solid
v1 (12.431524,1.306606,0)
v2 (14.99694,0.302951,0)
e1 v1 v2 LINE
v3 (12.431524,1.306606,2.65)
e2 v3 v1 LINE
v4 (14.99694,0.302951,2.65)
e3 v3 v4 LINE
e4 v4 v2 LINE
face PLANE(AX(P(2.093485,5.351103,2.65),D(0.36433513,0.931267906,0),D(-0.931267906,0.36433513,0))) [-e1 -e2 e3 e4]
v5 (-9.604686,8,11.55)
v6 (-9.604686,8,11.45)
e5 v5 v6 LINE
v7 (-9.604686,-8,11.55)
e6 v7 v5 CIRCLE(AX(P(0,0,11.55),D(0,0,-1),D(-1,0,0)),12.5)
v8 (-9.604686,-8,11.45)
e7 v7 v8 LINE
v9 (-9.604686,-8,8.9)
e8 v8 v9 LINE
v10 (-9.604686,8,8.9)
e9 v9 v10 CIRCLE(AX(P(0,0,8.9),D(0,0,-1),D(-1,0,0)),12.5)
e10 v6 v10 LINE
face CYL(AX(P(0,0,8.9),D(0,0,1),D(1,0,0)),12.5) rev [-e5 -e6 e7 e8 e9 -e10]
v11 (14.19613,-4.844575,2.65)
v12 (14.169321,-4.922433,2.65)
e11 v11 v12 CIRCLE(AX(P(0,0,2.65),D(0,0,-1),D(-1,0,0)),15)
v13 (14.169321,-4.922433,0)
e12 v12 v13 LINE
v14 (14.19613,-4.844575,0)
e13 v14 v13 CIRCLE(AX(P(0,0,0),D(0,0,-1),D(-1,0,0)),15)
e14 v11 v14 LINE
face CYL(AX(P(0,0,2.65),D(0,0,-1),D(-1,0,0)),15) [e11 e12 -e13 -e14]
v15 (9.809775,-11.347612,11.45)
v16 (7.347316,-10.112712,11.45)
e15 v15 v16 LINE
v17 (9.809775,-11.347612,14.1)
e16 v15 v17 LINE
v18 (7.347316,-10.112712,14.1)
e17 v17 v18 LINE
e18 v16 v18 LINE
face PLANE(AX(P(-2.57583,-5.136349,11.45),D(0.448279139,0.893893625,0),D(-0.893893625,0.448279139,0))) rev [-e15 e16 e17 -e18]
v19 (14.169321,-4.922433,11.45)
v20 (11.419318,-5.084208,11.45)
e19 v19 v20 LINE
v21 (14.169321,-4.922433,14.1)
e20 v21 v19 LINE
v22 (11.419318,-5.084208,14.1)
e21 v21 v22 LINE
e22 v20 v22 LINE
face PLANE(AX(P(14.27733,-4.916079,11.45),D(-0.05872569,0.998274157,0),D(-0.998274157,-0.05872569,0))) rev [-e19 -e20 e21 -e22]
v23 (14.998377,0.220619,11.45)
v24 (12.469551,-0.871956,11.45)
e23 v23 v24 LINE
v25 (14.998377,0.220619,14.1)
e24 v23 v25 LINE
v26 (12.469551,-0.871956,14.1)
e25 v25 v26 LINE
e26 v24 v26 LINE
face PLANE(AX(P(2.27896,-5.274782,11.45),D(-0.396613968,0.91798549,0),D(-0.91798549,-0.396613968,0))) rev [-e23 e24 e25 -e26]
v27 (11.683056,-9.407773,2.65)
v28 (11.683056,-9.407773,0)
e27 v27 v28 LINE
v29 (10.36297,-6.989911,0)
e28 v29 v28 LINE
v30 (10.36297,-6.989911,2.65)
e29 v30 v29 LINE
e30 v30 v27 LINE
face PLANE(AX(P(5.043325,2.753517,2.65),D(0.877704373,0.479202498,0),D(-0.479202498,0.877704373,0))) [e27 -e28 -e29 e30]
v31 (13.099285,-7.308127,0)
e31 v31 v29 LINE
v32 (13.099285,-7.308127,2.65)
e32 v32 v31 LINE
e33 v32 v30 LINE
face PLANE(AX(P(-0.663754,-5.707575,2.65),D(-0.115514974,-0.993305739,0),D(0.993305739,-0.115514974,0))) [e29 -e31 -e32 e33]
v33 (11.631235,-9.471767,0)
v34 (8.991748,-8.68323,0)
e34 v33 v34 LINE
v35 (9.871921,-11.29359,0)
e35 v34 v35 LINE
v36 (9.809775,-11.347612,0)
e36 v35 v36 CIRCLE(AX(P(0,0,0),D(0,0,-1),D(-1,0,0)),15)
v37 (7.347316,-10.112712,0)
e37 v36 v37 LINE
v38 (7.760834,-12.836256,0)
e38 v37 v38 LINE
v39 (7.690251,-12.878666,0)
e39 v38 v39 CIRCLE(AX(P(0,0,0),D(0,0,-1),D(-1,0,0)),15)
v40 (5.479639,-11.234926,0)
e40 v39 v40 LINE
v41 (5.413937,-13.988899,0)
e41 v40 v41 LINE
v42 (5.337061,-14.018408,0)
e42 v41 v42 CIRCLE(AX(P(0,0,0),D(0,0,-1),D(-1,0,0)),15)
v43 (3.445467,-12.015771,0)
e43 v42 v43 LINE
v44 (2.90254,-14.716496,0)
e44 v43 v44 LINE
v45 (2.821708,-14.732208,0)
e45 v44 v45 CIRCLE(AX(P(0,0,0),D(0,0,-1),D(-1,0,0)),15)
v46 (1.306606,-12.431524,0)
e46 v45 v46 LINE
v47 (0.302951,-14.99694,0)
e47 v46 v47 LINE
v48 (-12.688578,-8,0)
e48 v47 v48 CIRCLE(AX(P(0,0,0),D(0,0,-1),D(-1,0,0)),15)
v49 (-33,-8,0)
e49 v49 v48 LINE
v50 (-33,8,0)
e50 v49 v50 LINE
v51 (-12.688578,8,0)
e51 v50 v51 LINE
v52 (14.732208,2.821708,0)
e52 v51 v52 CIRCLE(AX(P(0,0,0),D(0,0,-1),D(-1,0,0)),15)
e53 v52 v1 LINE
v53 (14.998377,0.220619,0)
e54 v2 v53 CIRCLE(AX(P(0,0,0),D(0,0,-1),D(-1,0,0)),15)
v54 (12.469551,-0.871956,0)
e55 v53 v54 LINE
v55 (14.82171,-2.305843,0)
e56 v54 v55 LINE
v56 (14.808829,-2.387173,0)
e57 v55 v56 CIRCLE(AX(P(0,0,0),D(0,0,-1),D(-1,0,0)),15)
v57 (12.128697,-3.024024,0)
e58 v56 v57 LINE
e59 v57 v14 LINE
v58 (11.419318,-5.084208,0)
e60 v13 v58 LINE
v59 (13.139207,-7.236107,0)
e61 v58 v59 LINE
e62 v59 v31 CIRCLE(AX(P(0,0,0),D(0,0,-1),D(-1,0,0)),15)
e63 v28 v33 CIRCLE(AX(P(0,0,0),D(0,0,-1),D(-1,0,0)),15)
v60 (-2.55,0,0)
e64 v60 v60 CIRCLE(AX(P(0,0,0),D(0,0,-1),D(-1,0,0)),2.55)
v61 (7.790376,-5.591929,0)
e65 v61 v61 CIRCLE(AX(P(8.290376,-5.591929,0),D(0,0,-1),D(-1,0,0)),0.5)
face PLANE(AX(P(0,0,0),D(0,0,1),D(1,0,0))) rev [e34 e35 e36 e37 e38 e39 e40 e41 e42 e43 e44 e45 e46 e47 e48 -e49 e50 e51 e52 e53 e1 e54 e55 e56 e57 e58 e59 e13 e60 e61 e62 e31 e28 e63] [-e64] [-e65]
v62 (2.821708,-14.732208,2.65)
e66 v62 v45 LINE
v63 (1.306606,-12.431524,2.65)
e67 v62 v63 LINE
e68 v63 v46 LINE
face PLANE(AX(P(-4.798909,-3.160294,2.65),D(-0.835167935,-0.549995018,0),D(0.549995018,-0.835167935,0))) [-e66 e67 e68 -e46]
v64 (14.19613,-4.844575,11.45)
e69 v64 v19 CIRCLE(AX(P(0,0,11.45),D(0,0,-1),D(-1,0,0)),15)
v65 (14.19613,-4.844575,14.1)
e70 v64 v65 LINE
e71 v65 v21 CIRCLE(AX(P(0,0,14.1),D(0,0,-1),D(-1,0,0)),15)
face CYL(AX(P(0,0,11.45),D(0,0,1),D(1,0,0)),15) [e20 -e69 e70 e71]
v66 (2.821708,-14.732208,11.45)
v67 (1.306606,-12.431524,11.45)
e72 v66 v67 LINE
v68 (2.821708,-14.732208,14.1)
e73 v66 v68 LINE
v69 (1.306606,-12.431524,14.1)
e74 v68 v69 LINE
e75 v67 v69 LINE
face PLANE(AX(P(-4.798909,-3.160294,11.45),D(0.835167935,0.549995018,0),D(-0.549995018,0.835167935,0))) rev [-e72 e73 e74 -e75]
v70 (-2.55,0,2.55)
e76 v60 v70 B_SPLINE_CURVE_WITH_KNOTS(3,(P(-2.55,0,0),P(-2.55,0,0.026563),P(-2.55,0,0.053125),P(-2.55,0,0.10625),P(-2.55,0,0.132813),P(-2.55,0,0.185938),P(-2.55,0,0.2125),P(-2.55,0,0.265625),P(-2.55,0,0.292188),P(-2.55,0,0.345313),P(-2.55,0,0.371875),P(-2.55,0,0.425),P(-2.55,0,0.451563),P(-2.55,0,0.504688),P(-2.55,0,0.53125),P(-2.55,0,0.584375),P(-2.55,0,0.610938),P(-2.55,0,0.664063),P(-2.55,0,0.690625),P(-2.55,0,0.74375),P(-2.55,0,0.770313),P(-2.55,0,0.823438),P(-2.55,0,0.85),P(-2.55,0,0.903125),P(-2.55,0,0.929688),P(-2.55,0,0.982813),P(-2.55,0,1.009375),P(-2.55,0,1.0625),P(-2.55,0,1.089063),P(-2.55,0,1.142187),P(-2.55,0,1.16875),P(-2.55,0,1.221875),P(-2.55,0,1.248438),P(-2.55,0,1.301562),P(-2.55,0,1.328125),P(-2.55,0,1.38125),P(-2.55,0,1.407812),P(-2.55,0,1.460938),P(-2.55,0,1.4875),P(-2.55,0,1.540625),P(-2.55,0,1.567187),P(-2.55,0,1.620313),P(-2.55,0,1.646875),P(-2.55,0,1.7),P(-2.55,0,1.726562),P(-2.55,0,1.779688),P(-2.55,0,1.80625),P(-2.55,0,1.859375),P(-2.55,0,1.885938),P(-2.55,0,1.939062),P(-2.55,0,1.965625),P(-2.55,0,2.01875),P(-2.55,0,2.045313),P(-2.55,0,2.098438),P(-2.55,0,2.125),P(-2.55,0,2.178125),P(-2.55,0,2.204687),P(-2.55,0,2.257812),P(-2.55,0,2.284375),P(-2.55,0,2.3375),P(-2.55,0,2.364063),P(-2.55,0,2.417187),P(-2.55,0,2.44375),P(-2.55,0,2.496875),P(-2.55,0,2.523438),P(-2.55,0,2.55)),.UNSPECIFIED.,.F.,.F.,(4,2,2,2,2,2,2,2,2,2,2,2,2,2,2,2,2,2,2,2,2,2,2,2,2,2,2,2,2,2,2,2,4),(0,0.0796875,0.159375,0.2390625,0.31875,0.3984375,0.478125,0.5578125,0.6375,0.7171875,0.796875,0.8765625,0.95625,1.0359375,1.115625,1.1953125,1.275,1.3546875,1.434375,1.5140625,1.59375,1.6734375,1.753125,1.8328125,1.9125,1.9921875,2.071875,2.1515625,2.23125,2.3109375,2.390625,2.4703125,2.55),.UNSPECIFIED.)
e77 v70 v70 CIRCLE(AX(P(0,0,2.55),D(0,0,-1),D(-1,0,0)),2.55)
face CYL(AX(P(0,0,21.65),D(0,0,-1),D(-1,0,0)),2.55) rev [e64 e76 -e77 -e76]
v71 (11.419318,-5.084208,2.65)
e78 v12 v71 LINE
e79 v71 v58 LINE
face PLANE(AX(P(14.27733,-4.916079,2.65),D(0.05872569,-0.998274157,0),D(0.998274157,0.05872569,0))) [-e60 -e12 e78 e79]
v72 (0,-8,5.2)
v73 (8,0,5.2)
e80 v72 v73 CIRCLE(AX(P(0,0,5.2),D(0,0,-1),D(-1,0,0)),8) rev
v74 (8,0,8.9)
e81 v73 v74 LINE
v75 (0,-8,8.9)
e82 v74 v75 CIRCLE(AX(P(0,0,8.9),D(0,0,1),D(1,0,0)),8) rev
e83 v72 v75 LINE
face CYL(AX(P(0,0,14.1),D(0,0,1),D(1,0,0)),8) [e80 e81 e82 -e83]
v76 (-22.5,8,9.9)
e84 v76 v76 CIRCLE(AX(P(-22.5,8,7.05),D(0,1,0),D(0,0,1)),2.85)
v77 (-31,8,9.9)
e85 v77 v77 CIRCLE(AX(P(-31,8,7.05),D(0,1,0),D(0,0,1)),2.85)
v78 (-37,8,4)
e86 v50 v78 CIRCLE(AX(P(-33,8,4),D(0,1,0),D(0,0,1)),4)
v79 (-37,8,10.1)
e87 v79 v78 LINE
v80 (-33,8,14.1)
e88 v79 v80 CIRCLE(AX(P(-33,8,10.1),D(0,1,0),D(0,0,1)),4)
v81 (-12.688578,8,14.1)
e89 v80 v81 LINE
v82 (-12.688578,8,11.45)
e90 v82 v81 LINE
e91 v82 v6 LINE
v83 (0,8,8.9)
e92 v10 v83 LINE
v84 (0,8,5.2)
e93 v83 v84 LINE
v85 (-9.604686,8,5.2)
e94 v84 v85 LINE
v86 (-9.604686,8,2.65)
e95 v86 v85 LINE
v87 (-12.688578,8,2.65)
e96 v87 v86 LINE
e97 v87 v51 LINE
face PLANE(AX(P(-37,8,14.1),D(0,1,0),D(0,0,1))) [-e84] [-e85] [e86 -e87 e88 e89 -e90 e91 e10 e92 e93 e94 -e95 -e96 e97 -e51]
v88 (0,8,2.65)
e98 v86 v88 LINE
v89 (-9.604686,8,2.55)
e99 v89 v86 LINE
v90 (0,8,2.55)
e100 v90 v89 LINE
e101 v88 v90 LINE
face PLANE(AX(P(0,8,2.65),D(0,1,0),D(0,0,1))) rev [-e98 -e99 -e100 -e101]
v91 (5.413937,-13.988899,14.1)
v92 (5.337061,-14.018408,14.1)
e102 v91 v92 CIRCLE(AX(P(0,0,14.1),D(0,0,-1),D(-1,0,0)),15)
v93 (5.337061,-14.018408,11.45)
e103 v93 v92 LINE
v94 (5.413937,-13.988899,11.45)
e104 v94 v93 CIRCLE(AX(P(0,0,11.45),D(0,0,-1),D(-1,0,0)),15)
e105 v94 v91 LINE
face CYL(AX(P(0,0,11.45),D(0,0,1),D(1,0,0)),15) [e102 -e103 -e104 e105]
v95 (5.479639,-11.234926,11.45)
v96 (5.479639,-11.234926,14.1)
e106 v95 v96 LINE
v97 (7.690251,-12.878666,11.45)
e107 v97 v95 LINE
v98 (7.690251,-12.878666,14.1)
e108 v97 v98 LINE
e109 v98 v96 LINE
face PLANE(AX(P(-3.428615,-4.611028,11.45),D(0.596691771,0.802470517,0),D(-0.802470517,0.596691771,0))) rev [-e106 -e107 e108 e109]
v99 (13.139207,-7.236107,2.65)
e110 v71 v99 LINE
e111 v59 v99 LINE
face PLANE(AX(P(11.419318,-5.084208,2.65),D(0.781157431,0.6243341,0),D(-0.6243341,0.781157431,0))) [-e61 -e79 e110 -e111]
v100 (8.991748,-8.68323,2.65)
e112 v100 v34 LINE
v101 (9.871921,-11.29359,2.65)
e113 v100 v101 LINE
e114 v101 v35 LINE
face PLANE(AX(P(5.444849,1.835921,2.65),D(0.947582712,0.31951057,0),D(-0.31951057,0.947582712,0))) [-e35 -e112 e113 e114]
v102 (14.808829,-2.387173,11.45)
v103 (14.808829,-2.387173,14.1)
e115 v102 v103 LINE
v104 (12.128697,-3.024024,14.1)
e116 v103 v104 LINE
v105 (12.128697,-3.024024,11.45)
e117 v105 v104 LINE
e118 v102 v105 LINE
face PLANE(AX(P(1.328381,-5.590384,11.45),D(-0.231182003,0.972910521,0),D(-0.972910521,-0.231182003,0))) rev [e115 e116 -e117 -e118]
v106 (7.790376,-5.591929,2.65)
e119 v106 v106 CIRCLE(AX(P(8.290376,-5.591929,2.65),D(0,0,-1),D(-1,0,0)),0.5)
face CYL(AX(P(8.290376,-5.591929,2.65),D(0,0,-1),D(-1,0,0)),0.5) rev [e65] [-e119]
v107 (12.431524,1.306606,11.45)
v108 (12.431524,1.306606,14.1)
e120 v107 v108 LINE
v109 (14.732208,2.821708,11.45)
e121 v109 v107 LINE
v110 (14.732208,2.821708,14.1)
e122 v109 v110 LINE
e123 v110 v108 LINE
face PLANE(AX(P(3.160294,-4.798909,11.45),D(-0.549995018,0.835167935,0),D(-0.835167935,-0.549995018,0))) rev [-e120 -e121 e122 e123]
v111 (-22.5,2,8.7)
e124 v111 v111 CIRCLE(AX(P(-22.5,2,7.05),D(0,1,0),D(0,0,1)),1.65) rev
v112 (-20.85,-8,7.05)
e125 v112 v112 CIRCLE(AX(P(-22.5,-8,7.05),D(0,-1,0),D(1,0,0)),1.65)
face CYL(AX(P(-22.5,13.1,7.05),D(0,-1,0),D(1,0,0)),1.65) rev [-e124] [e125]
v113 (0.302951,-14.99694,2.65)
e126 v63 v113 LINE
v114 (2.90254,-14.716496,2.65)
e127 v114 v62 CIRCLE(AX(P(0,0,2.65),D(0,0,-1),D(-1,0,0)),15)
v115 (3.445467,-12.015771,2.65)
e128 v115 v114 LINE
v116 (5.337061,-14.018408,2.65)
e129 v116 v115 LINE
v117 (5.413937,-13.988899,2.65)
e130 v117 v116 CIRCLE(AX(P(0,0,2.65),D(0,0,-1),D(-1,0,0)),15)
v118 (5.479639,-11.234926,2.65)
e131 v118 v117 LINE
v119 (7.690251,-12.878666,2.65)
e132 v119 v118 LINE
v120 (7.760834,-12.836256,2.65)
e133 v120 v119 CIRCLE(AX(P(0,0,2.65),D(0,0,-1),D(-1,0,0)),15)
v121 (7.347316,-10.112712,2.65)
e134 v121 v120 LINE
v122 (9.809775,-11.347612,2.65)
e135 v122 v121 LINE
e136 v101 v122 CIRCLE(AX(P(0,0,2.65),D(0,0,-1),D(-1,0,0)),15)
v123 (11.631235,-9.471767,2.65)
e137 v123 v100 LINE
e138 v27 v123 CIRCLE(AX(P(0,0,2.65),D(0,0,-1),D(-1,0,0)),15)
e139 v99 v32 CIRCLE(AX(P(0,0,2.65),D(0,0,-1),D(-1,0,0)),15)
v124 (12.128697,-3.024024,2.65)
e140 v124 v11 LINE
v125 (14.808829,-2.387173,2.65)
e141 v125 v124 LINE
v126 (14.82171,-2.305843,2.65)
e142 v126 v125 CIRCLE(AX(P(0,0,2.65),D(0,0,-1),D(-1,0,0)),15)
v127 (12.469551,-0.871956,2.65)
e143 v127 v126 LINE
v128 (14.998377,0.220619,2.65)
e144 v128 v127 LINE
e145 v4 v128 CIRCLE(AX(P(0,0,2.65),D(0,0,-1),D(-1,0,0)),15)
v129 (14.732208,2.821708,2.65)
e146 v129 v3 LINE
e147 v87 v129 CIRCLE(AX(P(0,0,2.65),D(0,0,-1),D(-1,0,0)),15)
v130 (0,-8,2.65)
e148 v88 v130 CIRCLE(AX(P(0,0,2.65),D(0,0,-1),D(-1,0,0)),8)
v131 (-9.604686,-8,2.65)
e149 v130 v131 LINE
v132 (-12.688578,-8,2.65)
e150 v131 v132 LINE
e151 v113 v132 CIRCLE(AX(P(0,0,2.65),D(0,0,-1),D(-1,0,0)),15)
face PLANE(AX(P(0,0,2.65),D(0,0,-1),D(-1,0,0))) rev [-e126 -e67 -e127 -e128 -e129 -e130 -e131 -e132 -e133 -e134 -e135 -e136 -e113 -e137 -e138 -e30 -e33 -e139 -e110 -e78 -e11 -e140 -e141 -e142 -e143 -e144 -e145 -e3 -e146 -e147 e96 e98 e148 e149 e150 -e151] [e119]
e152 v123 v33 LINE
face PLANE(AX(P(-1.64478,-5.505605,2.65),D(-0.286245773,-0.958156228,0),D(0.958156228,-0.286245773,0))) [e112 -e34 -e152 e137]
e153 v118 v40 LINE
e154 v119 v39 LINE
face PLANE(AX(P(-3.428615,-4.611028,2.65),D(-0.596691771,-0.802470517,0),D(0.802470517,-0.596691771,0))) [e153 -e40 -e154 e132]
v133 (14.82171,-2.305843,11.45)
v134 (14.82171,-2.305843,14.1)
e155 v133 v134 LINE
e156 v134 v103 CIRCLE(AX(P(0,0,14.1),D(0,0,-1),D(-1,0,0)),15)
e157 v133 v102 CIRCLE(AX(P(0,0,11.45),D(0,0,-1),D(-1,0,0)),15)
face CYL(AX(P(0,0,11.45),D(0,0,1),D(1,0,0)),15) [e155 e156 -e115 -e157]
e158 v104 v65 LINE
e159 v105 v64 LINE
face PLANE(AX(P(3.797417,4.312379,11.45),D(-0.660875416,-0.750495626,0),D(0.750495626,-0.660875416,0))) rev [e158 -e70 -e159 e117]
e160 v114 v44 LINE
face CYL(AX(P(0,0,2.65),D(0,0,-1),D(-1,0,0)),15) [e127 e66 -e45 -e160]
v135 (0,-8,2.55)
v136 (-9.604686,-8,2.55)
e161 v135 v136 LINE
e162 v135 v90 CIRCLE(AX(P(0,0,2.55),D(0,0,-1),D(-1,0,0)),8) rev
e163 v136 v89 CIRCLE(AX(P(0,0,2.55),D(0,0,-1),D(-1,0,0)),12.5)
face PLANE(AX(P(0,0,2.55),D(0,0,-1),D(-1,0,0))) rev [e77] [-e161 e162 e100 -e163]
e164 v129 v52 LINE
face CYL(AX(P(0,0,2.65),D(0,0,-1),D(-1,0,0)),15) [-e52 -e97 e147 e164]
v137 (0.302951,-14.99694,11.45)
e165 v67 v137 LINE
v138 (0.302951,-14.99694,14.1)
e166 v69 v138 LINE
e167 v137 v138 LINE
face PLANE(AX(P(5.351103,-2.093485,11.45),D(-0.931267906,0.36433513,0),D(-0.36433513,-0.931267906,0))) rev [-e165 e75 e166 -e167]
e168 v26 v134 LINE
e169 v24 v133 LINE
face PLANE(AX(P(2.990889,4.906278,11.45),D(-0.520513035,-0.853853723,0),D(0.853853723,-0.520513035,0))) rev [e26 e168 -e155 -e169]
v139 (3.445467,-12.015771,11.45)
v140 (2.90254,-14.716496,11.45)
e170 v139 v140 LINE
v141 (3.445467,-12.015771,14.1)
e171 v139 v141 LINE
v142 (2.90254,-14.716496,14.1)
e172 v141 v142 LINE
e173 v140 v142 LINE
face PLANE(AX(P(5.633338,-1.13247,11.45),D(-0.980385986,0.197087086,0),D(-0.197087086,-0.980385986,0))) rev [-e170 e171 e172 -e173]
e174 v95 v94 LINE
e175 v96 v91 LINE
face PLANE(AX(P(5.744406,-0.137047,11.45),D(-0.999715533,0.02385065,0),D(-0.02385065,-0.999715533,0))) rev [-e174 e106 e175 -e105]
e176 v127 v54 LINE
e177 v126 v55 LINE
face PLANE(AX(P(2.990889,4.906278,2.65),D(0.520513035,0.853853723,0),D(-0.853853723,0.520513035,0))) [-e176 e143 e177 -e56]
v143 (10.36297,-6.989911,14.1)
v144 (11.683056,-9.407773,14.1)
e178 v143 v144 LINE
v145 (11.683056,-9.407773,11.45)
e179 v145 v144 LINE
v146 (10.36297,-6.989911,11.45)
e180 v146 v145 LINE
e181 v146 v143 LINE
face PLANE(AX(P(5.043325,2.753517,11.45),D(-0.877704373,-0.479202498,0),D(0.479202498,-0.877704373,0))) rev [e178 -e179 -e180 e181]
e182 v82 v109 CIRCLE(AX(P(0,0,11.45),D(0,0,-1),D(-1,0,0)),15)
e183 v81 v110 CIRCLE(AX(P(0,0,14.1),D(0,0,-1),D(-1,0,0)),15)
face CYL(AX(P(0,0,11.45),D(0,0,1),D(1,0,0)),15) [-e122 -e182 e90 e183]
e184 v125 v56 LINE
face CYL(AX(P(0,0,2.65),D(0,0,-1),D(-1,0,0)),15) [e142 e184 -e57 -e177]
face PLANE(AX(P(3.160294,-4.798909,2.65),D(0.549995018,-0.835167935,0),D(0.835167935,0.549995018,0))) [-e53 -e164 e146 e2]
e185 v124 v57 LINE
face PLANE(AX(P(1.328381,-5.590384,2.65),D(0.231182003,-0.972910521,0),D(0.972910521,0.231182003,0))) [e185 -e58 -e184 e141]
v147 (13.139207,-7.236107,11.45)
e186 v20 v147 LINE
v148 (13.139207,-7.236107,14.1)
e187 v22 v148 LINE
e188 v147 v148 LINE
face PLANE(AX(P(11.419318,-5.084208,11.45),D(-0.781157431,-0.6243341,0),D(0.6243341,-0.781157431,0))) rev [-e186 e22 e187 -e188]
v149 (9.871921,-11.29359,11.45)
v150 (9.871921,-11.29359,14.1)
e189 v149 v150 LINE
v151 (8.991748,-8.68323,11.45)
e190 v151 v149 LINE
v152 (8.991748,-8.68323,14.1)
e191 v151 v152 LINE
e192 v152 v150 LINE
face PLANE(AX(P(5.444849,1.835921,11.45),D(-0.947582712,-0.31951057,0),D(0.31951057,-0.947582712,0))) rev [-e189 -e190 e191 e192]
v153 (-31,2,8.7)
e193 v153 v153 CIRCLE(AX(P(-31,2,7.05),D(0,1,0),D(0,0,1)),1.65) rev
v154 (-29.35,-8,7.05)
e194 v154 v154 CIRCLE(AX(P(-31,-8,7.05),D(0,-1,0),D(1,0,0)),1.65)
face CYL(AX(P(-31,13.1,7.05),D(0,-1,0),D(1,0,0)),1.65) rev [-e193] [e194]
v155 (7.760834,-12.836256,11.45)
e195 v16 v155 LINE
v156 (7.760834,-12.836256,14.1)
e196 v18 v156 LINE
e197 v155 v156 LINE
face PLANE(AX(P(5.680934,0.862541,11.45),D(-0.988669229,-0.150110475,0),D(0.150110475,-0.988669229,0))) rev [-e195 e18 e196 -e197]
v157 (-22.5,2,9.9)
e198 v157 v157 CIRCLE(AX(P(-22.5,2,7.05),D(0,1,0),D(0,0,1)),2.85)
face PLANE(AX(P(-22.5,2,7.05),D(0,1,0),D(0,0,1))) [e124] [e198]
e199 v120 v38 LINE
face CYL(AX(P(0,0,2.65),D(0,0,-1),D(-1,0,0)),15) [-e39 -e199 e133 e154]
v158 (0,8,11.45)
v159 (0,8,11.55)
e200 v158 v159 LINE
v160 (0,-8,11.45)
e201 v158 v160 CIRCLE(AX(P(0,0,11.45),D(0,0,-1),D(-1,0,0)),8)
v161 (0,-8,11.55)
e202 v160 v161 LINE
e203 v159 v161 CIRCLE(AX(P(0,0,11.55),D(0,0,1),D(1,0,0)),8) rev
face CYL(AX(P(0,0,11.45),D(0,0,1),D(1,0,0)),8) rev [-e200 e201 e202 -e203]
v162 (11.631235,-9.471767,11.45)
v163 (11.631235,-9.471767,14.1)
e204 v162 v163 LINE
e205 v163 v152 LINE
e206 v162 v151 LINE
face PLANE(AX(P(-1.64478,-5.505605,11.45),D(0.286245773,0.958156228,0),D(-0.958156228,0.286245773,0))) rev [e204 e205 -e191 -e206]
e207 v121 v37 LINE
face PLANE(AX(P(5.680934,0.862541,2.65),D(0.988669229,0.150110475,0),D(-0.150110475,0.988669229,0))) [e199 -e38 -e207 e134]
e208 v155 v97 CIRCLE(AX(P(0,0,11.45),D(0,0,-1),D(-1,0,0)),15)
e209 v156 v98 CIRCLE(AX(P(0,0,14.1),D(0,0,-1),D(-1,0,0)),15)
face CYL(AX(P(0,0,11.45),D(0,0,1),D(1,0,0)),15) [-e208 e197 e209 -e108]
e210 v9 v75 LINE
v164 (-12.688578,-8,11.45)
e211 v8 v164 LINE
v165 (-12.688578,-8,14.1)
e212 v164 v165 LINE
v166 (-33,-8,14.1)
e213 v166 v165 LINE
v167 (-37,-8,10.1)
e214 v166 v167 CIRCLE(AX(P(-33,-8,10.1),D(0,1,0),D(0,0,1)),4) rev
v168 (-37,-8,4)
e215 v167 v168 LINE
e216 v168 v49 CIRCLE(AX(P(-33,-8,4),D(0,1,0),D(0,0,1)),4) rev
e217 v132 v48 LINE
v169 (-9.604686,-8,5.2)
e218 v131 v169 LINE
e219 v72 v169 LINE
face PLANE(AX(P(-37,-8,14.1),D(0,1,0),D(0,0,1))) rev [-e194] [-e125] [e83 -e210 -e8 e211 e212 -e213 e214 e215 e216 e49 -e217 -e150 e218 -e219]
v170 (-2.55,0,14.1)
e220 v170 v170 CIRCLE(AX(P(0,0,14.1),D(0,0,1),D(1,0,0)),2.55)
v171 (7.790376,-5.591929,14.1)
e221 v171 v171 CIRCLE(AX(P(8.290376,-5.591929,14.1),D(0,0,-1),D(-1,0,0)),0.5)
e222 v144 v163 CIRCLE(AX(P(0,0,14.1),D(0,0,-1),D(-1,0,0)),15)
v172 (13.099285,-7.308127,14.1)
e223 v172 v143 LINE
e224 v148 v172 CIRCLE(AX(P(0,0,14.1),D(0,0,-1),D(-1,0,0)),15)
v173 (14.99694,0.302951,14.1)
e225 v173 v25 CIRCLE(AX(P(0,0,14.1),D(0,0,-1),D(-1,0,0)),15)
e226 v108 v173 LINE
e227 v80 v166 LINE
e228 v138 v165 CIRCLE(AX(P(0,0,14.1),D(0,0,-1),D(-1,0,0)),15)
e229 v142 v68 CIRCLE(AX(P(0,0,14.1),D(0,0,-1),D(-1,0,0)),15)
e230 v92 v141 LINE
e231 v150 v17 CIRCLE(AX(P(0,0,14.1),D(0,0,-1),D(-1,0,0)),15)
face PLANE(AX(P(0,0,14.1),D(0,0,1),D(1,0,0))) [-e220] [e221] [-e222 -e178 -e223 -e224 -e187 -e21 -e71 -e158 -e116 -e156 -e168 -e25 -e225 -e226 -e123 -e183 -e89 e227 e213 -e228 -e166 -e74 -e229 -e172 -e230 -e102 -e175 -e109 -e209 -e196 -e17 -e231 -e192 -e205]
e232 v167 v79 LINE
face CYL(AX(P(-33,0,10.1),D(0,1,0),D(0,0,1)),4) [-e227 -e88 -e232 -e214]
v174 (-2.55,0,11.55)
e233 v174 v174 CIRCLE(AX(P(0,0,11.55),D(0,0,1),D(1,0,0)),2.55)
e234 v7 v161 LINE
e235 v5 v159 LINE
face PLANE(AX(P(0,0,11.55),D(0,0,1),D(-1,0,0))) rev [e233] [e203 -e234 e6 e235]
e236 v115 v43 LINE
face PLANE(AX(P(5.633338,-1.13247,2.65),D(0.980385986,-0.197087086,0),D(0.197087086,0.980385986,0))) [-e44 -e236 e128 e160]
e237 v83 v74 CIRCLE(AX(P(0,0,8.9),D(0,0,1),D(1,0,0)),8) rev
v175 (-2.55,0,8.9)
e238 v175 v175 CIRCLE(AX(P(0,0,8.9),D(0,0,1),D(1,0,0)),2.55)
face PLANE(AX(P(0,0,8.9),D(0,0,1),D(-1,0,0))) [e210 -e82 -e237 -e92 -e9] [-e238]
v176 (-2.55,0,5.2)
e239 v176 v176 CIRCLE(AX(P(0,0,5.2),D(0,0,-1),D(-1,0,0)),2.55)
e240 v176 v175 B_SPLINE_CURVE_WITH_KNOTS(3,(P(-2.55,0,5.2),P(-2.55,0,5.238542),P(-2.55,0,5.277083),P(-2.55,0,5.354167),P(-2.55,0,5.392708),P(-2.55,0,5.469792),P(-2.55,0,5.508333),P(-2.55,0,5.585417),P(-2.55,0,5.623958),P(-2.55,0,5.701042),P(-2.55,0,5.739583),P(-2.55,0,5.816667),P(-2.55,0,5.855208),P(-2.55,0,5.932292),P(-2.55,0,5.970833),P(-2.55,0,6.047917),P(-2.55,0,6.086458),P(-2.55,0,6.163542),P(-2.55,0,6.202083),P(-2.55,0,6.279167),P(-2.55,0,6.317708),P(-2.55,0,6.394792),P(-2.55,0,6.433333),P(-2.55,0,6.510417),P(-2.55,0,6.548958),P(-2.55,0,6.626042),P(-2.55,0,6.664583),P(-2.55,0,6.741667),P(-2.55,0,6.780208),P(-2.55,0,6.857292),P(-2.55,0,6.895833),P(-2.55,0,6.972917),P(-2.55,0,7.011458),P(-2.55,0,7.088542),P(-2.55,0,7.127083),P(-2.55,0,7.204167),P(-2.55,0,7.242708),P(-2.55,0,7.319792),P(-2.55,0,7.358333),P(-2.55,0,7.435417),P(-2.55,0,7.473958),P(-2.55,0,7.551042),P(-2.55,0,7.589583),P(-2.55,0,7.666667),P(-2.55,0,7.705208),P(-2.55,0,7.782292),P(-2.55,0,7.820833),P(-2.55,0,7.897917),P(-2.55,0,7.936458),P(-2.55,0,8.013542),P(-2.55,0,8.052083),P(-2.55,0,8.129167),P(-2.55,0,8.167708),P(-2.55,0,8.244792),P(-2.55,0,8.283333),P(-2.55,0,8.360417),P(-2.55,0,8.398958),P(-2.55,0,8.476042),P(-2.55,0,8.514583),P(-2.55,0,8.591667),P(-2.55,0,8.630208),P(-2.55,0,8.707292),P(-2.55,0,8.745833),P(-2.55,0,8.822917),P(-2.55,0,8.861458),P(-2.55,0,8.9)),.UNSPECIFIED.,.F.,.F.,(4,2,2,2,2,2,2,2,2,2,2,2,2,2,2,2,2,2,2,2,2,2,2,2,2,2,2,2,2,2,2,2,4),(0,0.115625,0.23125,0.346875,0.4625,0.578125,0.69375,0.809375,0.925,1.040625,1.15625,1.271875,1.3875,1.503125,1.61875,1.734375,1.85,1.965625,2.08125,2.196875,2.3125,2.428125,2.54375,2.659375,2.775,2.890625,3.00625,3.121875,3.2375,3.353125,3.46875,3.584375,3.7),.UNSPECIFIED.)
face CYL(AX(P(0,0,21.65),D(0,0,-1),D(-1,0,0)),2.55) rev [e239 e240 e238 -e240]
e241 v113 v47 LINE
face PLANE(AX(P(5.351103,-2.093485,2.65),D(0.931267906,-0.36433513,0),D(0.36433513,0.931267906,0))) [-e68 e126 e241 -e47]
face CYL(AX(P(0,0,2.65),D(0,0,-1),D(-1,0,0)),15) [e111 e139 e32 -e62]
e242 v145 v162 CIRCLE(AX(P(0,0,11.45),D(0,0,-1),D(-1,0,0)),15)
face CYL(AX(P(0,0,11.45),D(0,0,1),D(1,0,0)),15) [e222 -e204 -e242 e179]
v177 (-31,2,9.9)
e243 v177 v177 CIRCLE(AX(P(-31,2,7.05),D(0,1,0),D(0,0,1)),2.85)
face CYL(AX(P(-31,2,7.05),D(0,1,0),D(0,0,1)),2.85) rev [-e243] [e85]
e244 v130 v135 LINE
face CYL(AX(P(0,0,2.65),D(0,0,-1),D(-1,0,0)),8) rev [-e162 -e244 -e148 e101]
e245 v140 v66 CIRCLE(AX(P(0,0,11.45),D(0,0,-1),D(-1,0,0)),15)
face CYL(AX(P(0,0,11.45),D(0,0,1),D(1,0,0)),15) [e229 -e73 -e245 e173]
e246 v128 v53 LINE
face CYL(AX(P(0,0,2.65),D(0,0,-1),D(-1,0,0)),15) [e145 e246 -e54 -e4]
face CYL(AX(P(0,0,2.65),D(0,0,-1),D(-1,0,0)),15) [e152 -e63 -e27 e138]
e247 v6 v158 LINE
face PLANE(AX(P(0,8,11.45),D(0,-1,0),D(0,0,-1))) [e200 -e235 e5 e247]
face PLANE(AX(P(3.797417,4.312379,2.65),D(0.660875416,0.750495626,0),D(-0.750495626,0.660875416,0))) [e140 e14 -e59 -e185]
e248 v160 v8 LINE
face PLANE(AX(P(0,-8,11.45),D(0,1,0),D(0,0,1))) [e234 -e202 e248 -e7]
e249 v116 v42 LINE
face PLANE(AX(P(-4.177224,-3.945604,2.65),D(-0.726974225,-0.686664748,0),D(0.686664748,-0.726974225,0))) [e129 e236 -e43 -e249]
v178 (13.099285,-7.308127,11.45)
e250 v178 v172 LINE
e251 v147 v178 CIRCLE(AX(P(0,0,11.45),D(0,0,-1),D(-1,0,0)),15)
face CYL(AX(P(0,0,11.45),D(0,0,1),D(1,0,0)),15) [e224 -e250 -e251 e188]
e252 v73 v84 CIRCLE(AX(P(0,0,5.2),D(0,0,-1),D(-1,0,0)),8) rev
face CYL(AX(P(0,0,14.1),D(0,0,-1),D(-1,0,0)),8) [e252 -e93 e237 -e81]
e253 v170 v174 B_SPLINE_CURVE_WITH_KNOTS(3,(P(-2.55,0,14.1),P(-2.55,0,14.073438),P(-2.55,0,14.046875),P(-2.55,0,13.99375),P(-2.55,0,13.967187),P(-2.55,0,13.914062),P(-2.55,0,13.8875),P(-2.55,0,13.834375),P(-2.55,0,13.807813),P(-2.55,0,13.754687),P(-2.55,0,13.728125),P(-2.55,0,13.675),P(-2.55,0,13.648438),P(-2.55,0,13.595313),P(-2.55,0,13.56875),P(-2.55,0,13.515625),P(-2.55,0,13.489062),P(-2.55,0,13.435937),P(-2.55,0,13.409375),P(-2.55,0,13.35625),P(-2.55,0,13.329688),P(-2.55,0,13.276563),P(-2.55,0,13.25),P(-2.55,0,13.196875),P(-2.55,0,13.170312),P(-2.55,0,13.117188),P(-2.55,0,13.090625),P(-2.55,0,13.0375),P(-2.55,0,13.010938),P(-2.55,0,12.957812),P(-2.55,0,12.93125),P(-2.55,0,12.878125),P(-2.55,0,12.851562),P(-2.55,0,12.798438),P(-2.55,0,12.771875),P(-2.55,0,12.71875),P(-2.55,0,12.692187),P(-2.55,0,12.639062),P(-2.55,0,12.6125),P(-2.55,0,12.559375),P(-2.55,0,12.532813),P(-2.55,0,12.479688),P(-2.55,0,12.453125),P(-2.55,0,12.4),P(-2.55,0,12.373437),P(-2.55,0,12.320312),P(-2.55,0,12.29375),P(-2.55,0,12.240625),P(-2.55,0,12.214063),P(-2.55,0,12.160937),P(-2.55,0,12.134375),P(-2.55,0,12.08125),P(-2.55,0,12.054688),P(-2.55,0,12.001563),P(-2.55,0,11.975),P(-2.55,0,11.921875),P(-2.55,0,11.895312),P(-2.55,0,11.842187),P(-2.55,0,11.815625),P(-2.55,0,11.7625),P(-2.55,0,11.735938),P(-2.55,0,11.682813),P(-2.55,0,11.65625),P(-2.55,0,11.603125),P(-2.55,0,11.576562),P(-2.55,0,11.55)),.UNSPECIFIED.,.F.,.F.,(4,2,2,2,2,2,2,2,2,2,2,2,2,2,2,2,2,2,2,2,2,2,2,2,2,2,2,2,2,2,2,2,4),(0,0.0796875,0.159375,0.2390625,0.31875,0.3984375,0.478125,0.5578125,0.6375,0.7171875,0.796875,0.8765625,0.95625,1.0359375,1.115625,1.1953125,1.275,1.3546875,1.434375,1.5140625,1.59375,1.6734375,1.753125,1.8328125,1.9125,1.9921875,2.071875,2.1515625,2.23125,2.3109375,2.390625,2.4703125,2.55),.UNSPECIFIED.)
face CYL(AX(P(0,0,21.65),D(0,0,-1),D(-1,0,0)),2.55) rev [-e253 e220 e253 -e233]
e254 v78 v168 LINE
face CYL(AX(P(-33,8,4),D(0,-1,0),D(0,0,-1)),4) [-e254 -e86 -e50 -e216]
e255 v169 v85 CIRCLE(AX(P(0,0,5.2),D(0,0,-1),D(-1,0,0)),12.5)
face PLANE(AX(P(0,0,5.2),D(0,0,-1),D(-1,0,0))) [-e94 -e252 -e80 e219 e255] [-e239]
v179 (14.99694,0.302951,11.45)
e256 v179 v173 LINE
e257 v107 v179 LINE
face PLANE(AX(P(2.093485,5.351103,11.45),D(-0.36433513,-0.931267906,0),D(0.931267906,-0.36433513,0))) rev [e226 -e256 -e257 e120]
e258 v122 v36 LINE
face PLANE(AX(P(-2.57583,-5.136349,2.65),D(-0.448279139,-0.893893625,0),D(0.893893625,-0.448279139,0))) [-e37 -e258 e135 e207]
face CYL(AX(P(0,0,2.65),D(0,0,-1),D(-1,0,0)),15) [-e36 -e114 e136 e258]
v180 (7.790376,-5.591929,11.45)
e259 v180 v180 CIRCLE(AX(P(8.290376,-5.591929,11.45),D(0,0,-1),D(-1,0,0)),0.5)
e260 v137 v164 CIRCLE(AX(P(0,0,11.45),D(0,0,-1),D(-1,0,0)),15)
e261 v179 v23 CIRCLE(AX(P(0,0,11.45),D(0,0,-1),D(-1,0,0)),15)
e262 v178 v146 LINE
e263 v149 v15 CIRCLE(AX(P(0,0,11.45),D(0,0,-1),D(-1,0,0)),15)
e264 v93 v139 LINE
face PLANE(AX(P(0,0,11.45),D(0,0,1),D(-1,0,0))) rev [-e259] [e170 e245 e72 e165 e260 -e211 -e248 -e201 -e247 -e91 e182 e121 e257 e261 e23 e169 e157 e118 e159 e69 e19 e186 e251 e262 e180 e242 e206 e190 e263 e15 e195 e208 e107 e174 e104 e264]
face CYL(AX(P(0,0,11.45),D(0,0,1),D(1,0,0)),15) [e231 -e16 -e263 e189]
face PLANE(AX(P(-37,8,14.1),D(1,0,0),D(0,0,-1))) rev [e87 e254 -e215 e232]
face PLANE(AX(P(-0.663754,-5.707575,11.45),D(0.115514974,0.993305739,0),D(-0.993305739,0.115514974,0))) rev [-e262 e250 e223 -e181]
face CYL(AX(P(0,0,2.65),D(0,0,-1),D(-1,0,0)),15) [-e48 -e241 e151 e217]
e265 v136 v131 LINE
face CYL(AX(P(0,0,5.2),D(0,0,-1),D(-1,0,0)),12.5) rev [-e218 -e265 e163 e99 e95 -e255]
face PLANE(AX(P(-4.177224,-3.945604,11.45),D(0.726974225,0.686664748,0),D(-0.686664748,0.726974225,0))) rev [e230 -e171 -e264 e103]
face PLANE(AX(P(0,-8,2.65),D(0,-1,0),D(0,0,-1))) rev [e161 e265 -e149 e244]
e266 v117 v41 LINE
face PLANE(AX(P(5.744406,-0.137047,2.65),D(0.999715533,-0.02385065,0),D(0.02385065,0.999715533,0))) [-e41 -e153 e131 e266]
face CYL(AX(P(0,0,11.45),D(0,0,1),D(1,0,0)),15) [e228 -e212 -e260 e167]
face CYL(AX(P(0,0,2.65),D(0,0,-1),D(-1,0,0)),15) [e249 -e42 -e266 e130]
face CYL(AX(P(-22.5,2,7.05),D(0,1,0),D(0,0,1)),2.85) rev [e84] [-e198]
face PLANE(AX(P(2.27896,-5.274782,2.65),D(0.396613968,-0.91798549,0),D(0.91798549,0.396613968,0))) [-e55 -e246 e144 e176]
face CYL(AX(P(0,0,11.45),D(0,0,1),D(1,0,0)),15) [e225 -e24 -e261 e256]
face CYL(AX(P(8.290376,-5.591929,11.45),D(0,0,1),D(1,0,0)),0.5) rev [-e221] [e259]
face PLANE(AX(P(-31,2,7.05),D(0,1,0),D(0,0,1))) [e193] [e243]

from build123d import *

# Parameters (mm, degrees)
SKETCH1_W           = 45
SKETCH1_H           = 16
BOSS_EXTRUDE1_DEPTH = 14.1
FILLET1_R           = 8
SKETCH2_R           = 1.65
CUT_EXTRUDE1_DEPTH  = 21.1
SKETCH4_R           = 12.5
CUT_EXTRUDE2_DEPTH  = 2.65
BOSS_EXTRUDE3_DEPTH = 2.65
SKETCH7_R           = 0.5
CUT_EXTRUDE3_DEPTH  = 2.65
FILLET2_R           = 4
SKETCH8_R           = 2.55
CUT_EXTRUDE4_DEPTH  = 21.65
SKETCH9_R           = 2.85
CUT_EXTRUDE5_DEPTH  = 6


with BuildPart() as part:
    # Sketch1 → Boss-Extrude1 (new body)
    with BuildSketch(Plane.XY):
        with Locations((-14.5, 0)):
            Rectangle(SKETCH1_W, SKETCH1_H)
    extrude(amount=BOSS_EXTRUDE1_DEPTH)

    # Fillet1
    fillet1_edges = [part.edges().sort_by_distance(p)[0] for p in [
        (8, -8, 7.05),
        (8, 8, 7.05),
    ]]
    fillet(fillet1_edges, radius=FILLET1_R - 0.0001)  # a hair under: the kernel refuses the full size

    # Sketch2 → Cut-Extrude1 (cut)
    with BuildSketch(Plane.XZ.offset(8)):
        with Locations((-22.5, 7.05)):
            Circle(SKETCH2_R)
        with Locations((-31, 7.05)):
            Circle(SKETCH2_R)
    extrude(amount=-CUT_EXTRUDE1_DEPTH, mode=Mode.SUBTRACT)

    # Sketch4 → Cut-Extrude2 (cut)
    with BuildSketch(Plane(origin=(0, 0, 2.55), x_dir=(-1, 0, 0), z_dir=(0, 0, -1))):
        Circle(SKETCH4_R)
    cut_extrude2 = extrude(amount=-CUT_EXTRUDE2_DEPTH, mode=Mode.SUBTRACT)

    # Mirror1: Cut-Extrude2 across plane
    add(cut_extrude2.mirror(Plane(origin=(0, 0, 7.05), x_dir=(1, 0, 0), z_dir=(0, 0, -1))), mode=Mode.SUBTRACT)

    # Sketch6 → Boss-Extrude3 (add)
    with BuildSketch(Plane(origin=(0, 0, 0), x_dir=(-1, 0, 0), z_dir=(0, 0, -1))):
        with BuildLine():
            Line((0, 8), (12.68857754, 8))
            ThreePointArc((12.68857754, 8), (-15, 0), (12.68857754, -8))
            Line((12.68857754, -8), (0, -8))
            ThreePointArc((0, -8), (-5.656854249, -5.656854249), (-8, 0))
            ThreePointArc((-8, 0), (-5.656854249, 5.656854249), (0, 8))
        make_face()
    boss_extrude3 = extrude(amount=-BOSS_EXTRUDE3_DEPTH)

    # Sketch7 → Cut-Extrude3 (cut)
    with BuildSketch(Plane(origin=(0, 0, 0), x_dir=(-1, 0, 0), z_dir=(0, 0, -1))):
        with BuildLine():
            Line((-10.362969657, -6.989911293), (-13.099285488, -7.308126963))
            ThreePointArc((-13.099285488, -7.308126963), (-12.435563588, -8.387893552), (-11.68305604, -9.407773465))
            Line((-11.68305604, -9.407773465), (-10.362969657, -6.989911293))
        make_face()
        with BuildLine():
            Line((-8.991747504, -8.683229631), (-11.631234978, -9.471767147))
            ThreePointArc((-11.631234978, -9.471767147), (-10.790097005, -10.419875557), (-9.871921449, -11.293589638))
            Line((-9.871921449, -11.293589638), (-8.991747504, -8.683229631))
        make_face()
        with BuildLine():
            Line((-7.347315654, -10.11271243), (-9.809775279, -11.347612479))
            ThreePointArc((-9.809775279, -11.347612479), (-8.816778784, -12.135254916), (-7.76083352, -12.836255804))
            Line((-7.76083352, -12.836255804), (-7.347315654, -10.11271243))
        make_face()
        with BuildLine():
            Line((-5.479639335, -11.234925579), (-7.690250522, -12.878666348))
            ThreePointArc((-7.690250522, -12.878666348), (-6.575567202, -13.481910694), (-5.413936592, -13.988898834))
            Line((-5.413936592, -13.988898834), (-5.479639335, -11.234925579))
        make_face()
        with BuildLine():
            Line((-3.445466948, -12.015771199), (-5.337061395, -14.018408457))
            ThreePointArc((-5.337061395, -14.018408457), (-4.134560337, -14.418925439), (-2.90253994, -14.716496251))
            Line((-2.90253994, -14.716496251), (-3.445466948, -12.015771199))
        make_face()
        with BuildLine():
            ThreePointArc((-14.808828542, -2.387173479), (-14.554435894, -3.628828434), (-14.196129578, -4.844574801))
            Line((-14.196129578, -4.844574801), (-12.128696578, -3.024023695))
            Line((-12.128696578, -3.024023695), (-14.808828542, -2.387173479))
        make_face()
        with BuildLine():
            ThreePointArc((-14.998377485, 0.22061914), (-14.963460754, -1.046347106), (-14.821710057, -2.305842793))
            Line((-14.821710057, -2.305842793), (-12.469550628, -0.871955922))
            Line((-12.469550628, -0.871955922), (-14.998377485, 0.22061914))
        make_face()
        with Locations((-8.290375726, -5.591929035)):
            Circle(SKETCH7_R)
        with BuildLine():
            Line((-1.306605791, -12.431523692), (-2.821708358, -14.732208319))
            ThreePointArc((-2.821708358, -14.732208319), (-1.567926949, -14.917828431), (-0.302951081, -14.996940376))
            Line((-0.302951081, -14.996940376), (-1.306605791, -12.431523692))
        make_face()
        with BuildLine():
            ThreePointArc((-14.732208319, 2.821708358), (-14.917828431, 1.567926949), (-14.996940376, 0.302951081))
            Line((-14.996940376, 0.302951081), (-12.431523692, 1.306605791))
            Line((-12.431523692, 1.306605791), (-14.732208319, 2.821708358))
        make_face()
        Polygon((-11.419318221, -5.084208038), (-13.206757578, -7.320625266), (-14.277330492, -4.916079132), align=None)
    cut_extrude3 = extrude(amount=-CUT_EXTRUDE3_DEPTH, mode=Mode.SUBTRACT)

    # Mirror8: Boss-Extrude3, Cut-Extrude3 across plane
    add(boss_extrude3.mirror(Plane(origin=(0, 0, 7.05), x_dir=(1, 0, 0), z_dir=(0, 0, -1))))
    add(cut_extrude3.mirror(Plane(origin=(0, 0, 7.05), x_dir=(1, 0, 0), z_dir=(0, 0, -1))), mode=Mode.SUBTRACT)

    # Fillet2
    fillet2_edges = [part.edges().sort_by_distance(p)[0] for p in [
        (-37, 0, 14.1),
        (-37, 0, 0),
    ]]
    fillet(fillet2_edges, radius=FILLET2_R)

    # Sketch8 → Cut-Extrude4 (cut)
    with BuildSketch(Plane(origin=(0, 0, 0), x_dir=(-1, 0, 0), z_dir=(0, 0, -1))):
        Circle(SKETCH8_R)
    extrude(amount=-CUT_EXTRUDE4_DEPTH, mode=Mode.SUBTRACT)

    # Sketch9 → Cut-Extrude5 (cut)
    with BuildSketch(Plane(origin=(0, 8, 0), x_dir=(1, 0, 0), z_dir=(0, 1, 0))):
        with Locations(Location((-31, -7.05, 0), (0, 0, 270))):
            Circle(SKETCH9_R)
        with Locations(Location((-22.5, -7.05, 0), (0, 0, 270))):
            Circle(SKETCH9_R)
    extrude(amount=-CUT_EXTRUDE5_DEPTH, mode=Mode.SUBTRACT)


solid = part.part
